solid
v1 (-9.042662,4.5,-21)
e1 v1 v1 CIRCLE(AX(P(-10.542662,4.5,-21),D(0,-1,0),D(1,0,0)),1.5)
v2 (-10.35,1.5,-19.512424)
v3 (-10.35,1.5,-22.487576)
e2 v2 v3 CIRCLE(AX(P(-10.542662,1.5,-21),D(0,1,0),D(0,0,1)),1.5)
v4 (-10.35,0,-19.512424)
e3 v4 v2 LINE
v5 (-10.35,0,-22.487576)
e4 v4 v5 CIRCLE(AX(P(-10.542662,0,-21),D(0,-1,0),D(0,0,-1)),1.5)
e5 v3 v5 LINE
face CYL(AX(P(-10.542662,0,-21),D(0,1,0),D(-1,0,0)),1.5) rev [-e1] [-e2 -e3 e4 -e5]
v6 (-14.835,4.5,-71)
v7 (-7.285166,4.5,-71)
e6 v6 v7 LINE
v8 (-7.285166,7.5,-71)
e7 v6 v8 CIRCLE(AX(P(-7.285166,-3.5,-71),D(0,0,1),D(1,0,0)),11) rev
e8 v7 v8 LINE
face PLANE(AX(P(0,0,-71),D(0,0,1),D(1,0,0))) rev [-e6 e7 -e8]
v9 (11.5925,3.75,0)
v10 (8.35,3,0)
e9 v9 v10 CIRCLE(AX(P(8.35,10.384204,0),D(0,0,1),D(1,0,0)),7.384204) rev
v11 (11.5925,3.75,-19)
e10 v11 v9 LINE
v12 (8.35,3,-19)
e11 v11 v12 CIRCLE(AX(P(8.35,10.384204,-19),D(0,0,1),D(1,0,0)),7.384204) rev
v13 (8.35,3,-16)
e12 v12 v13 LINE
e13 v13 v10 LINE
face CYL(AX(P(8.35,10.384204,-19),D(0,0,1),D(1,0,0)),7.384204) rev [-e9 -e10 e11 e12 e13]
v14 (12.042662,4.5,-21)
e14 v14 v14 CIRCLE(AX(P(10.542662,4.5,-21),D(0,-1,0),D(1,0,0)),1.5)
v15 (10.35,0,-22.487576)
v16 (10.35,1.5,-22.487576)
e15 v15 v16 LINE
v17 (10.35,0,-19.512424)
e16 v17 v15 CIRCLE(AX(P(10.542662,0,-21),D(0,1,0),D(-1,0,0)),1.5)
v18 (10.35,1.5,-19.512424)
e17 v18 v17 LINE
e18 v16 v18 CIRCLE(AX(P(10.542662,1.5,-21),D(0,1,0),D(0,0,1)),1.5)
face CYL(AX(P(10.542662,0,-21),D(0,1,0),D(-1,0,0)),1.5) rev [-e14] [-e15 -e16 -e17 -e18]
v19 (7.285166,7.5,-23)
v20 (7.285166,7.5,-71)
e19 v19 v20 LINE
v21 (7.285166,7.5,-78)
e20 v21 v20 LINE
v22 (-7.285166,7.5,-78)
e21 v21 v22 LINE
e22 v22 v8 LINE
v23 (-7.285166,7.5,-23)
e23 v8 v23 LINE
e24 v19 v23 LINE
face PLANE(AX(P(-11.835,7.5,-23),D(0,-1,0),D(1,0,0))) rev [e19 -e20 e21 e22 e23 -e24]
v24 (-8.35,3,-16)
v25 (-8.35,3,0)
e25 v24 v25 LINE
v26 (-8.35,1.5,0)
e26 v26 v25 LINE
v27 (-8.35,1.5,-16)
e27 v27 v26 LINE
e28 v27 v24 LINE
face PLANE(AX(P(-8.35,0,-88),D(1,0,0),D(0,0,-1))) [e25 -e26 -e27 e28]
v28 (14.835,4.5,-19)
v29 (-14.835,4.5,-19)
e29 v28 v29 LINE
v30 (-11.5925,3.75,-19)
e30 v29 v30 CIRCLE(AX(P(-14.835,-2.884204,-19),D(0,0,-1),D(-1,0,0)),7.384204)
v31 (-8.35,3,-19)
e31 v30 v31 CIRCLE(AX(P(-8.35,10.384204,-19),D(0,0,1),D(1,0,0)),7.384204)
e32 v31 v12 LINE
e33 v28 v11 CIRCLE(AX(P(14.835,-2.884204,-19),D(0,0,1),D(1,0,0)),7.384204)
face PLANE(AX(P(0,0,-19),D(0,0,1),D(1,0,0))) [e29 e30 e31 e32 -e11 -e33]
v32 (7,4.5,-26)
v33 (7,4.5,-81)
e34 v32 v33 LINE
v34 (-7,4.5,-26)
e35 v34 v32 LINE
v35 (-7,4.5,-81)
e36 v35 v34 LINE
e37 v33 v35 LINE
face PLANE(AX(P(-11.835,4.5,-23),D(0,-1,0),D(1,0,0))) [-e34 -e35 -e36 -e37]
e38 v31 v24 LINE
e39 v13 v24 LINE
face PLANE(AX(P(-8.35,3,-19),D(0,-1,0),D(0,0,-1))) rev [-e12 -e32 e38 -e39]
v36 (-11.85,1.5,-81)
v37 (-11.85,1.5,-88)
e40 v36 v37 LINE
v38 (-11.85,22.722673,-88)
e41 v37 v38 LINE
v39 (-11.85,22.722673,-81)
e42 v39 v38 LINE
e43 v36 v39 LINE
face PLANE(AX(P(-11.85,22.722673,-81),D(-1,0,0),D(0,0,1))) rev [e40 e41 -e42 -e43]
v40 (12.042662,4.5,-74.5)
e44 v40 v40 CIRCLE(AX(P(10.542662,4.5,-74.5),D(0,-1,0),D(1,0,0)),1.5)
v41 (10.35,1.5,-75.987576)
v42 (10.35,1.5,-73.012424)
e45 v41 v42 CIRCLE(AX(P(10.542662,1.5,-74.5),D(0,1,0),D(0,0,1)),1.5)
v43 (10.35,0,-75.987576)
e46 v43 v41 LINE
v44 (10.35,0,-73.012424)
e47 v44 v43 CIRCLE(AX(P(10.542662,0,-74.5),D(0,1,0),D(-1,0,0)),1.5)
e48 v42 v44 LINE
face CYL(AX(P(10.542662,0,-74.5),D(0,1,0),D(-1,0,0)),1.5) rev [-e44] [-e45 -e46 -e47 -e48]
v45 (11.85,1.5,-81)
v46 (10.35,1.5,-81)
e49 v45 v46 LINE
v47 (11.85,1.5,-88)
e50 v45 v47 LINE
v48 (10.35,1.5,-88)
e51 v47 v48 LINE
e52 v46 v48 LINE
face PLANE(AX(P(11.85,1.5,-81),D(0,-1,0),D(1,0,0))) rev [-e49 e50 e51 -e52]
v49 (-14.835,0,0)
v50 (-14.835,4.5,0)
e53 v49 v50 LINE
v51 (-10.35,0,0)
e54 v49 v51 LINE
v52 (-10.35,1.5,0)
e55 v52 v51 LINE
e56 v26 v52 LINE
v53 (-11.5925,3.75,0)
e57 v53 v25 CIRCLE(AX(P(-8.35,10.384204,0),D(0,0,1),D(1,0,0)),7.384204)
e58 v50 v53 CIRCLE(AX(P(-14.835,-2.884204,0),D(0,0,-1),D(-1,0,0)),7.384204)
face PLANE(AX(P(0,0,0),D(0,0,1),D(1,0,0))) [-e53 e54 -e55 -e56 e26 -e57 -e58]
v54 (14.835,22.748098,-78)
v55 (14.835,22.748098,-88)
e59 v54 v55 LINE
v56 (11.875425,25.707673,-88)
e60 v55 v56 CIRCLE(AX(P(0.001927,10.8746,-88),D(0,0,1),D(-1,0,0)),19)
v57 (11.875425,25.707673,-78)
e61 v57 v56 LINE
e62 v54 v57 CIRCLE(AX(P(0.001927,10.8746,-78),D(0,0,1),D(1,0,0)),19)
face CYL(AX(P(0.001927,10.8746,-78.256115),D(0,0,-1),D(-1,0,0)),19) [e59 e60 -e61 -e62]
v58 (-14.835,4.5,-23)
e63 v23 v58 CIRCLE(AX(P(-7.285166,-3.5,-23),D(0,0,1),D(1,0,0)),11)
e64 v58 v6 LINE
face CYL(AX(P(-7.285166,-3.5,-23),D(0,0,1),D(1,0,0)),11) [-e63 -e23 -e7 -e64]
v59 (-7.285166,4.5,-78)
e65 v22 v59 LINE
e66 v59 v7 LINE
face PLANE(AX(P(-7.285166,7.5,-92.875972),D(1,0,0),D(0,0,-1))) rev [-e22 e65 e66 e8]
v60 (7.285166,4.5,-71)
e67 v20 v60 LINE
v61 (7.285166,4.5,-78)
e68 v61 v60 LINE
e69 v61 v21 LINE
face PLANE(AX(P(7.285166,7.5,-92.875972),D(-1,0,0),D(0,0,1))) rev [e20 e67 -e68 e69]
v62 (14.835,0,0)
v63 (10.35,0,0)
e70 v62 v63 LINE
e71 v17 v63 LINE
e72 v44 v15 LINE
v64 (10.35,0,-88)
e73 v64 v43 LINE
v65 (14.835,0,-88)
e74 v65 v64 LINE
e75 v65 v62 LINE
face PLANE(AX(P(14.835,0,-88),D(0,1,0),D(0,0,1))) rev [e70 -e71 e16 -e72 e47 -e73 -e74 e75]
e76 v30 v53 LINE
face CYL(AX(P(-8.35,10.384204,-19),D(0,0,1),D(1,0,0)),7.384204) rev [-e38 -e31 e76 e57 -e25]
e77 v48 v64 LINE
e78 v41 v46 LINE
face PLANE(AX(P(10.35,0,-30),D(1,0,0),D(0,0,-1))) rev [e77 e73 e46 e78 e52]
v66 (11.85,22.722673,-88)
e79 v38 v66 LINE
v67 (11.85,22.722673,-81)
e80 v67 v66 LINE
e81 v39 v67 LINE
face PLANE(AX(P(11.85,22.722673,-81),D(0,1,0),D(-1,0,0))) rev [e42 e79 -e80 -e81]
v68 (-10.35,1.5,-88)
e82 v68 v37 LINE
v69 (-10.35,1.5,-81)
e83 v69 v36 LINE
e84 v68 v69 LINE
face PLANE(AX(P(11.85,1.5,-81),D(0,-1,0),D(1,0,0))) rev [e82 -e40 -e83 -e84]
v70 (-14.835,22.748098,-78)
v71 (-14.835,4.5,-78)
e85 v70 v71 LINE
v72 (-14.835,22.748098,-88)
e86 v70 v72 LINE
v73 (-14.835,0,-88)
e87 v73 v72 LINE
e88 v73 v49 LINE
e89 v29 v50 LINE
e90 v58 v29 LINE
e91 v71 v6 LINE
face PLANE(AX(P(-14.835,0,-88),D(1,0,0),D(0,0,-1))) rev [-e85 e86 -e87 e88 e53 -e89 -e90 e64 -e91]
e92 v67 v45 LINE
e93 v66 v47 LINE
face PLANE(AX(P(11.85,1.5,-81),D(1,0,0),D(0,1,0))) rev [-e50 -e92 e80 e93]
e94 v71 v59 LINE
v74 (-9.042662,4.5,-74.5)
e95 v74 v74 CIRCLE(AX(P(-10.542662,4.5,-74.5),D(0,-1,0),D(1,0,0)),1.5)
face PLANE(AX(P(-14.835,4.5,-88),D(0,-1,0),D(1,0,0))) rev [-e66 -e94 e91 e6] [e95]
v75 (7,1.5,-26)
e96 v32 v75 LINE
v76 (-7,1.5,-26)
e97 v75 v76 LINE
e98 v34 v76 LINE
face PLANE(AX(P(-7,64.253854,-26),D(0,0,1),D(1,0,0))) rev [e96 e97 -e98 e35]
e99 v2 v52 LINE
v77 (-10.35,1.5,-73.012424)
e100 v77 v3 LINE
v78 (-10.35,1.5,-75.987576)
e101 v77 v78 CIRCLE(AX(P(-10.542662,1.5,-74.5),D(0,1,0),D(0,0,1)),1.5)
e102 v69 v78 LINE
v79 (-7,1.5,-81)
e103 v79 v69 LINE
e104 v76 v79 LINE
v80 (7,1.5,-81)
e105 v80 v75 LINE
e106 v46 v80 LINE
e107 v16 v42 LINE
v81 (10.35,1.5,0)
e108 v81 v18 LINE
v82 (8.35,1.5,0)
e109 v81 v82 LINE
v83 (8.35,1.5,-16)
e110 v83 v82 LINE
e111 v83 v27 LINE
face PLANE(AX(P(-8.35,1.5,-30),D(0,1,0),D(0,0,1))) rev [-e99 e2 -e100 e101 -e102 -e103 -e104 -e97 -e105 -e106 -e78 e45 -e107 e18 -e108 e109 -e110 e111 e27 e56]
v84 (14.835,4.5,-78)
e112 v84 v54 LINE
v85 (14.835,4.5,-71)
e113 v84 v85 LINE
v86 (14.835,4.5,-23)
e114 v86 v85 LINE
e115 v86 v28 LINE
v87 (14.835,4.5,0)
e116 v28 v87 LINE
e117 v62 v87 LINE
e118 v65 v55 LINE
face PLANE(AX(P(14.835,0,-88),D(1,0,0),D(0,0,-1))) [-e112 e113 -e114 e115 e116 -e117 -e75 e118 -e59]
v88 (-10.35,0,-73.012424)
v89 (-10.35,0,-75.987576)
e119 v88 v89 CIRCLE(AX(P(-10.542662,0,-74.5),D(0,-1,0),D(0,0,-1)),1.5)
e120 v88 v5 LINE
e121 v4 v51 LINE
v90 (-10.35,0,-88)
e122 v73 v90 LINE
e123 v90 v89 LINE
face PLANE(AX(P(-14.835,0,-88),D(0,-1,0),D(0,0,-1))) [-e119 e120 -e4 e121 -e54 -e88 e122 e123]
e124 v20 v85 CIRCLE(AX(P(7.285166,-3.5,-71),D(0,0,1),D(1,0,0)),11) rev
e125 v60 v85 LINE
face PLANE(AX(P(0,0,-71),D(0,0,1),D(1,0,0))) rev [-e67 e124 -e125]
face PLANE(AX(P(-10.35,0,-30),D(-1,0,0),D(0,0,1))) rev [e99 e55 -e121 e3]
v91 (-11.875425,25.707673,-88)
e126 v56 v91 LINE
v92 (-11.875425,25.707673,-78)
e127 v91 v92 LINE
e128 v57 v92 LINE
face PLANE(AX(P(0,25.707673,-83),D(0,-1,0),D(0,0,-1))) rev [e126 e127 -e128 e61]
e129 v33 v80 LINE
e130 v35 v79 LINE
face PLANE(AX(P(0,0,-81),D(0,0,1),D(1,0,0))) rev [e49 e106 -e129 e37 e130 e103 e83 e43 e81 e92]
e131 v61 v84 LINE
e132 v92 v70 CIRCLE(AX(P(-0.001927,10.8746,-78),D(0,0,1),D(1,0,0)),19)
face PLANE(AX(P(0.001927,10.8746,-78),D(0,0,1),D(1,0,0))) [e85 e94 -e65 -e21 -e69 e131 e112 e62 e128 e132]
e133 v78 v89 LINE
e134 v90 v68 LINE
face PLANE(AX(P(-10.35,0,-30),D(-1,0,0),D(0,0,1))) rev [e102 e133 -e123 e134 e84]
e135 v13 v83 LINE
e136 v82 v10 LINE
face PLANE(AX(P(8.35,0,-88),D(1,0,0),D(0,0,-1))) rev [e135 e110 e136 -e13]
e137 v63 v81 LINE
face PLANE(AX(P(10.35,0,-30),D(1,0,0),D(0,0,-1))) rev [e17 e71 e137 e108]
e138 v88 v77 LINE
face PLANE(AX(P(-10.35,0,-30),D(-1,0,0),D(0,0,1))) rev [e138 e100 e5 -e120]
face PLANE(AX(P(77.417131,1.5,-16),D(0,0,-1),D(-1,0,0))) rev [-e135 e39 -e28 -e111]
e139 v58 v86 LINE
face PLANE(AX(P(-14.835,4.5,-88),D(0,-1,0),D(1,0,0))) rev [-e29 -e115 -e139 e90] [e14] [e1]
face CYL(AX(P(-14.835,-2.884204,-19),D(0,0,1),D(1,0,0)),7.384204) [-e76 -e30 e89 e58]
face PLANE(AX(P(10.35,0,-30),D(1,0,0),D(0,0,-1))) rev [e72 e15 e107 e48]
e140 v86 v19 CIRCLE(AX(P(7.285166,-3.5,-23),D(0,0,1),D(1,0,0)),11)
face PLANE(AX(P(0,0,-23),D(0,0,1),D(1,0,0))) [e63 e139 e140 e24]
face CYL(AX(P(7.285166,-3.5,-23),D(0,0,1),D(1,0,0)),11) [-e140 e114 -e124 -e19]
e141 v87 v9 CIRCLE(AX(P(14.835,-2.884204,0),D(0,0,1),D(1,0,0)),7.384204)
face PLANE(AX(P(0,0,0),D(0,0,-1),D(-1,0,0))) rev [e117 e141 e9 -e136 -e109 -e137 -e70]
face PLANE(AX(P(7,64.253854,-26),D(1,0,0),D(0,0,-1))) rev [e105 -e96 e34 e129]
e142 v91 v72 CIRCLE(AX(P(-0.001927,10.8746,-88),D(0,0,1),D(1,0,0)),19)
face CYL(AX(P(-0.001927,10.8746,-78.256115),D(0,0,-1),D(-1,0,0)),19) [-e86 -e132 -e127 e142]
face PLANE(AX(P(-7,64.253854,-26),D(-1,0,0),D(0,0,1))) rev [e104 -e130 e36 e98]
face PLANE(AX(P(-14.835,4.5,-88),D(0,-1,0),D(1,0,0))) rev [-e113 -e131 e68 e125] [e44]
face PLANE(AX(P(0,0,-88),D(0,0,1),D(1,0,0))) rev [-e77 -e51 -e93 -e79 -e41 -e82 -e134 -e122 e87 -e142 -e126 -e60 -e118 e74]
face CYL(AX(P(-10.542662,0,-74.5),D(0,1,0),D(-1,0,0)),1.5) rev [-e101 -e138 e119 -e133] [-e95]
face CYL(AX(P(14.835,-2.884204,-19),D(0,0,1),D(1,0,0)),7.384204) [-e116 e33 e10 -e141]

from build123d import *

# Parameters (mm, degrees)
SKETCH1_W               = 6.485
SKETCH1_H               = 4.5
BOSS_EXTRUDE1_DEPTH     = 88
BOSS_EXTRUDE1_2_DEPTH   = 88
SKETCH3_W               = 2
SKETCH3_H               = 1.5
CUT_EXTRUDE2_DEPTH      = 30
SKETCH4_W               = 2
SKETCH4_H               = 4.5
CUT_EXTRUDE3_DEPTH      = 65
BOSS_EXTRUDE2_REACH     = 93.644
SKETCH6_W               = 67
SKETCH6_H               = 3
BOSS_EXTRUDE3_DEPTH     = 5
CUT_EXTRUDE4_DEPTH      = 5
BOSS_EXTRUDE4_DEPTH     = 5
BOSS_EXTRUDE5_START     = 7
BOSS_EXTRUDE5_DEPTH     = 48
BOSS_EXTRUDE6_DEPTH     = 48
FILLET1_R               = 11
SKETCH18_W              = 14.57033113
SKETCH18_H              = 3
BOSS_EXTRUDE7_DEPTH     = 7
SKETCH15_W              = 23.7
SKETCH15_H              = 21.22267295
CUT_EXTRUDE6_DEPTH      = 7
SKETCH16_W              = 16.7
SKETCH16_H              = 1.5
CUT_EXTRUDE7_DEPTH      = 19
CUT_EXTRUDE5_DEPTH      = 92.727000479
CUT_EXTRUDE5_DEPTH_BACK = 92.727000479
SKETCH13_R              = 1.5
SKETCH17_W              = 14
SKETCH17_H              = 55
CUT_EXTRUDE8_DEPTH      = 3


with BuildPart() as part:
    # Sketch1 → Boss-Extrude1 (new body)
    with BuildSketch(Plane.XY):
        with Locations((-11.5925, 2.25)):
            Rectangle(SKETCH1_W, SKETCH1_H)
    extrude(amount=-BOSS_EXTRUDE1_DEPTH)


with BuildPart() as body_2:
    # Sketch1 → Boss-Extrude1 2 (new body)
    with BuildSketch(Plane.XY):
        with Locations((11.5925, 2.25)):
            Rectangle(SKETCH1_W, SKETCH1_H)
    extrude(amount=-BOSS_EXTRUDE1_2_DEPTH)


with BuildPart() as cut_extrude2_tool:
    # Sketch3 → Cut-Extrude2 (new body)
    with BuildSketch(Plane.XY):
        with Locations((-9.35, 0.75)):
            Rectangle(SKETCH3_W, SKETCH3_H)
        with Locations((9.35, 0.75)):
            Rectangle(SKETCH3_W, SKETCH3_H)
    extrude(amount=-CUT_EXTRUDE2_DEPTH)


with BuildPart() as part_1:
    add(part.part)

    # Cut-Extrude2: cut by cut_extrude2_tool
    add(cut_extrude2_tool.part, mode=Mode.SUBTRACT)


with BuildPart() as body_2_1:
    add(body_2.part)

    # Cut-Extrude2: cut by cut_extrude2_tool
    add(cut_extrude2_tool.part, mode=Mode.SUBTRACT)


with BuildPart() as cut_extrude3_tool:
    # Sketch4 → Cut-Extrude3 (new body)
    with BuildSketch(Plane(origin=(0, 0, -88), x_dir=(-1, 0, 0), z_dir=(0, 0, -1))):
        with Locations((9.35, 2.25)):
            Rectangle(SKETCH4_W, SKETCH4_H)
        with Locations((-9.35, 2.25)):
            Rectangle(SKETCH4_W, SKETCH4_H)
    extrude(amount=-CUT_EXTRUDE3_DEPTH)


with BuildPart() as part_2:
    add(part_1.part)

    # Cut-Extrude3: cut by cut_extrude3_tool
    add(cut_extrude3_tool.part, mode=Mode.SUBTRACT)


with BuildPart() as body_2_2:
    add(body_2_1.part)

    # Cut-Extrude3: cut by cut_extrude3_tool
    add(cut_extrude3_tool.part, mode=Mode.SUBTRACT)

    # Boss-Extrude2: up to this face of the body (flat: up to its plane)
    boss_extrude2_end = Plane(body_2_2.part.faces().sort_by_distance((10.35, 2.091743119, -50.857798165))[0])
    # Sketch6 → Boss-Extrude2 (add, up to the picked face)
    with BuildSketch(Plane(origin=(-10.35, 0, 0), x_dir=(0, 0, -1), z_dir=(1, 0, 0)), mode=Mode.PRIVATE) as boss_extrude2_sk1:
        with Locations((49.5, 3)):
            Rectangle(SKETCH6_W, SKETCH6_H)
    boss_extrude2_tool1 = split(extrude(boss_extrude2_sk1.sketch, amount=BOSS_EXTRUDE2_REACH, mode=Mode.PRIVATE), bisect_by=boss_extrude2_end, keep=Keep.BOTH, mode=Mode.PRIVATE)

    add(part_2.part)  # Boss-Extrude2 merges part
    add(boss_extrude2_tool1.solids().sort_by(Axis((-10.35, 3, -49.5), (1, 0, 0)))[0])

    # Sketch8 → Boss-Extrude3 (add)
    with BuildSketch(Plane(origin=(0, 0, -88), x_dir=(-1, 0, 0), z_dir=(0, 0, -1))):
        Polygon((-14.835, 25.70767295), (-14.835, 4.5), (-10.35, 4.5), (-10.35, 21.22267295), (10.35, 21.22267295), (10.35, 4.5), (14.835, 4.5), (14.835, 25.70767295), align=None)
    extrude(amount=-BOSS_EXTRUDE3_DEPTH)

    # Sketch9 → Cut-Extrude4 (cut)
    with BuildSketch(Plane(origin=(0, 0, -88), x_dir=(-1, 0, 0), z_dir=(0, 0, -1))):
        with BuildLine():
            Line((-15.009070225, 25.881743175), (-15.009070225, 22.527310239))
            ThreePointArc((-15.009070225, 22.527310239), (-13.436955933, 24.309628883), (-11.654637289, 25.881743175))
            Line((-11.654637289, 25.881743175), (-15.009070225, 25.881743175))
        make_face()
        with BuildLine():
            Line((15.009070225, 25.881743175), (15.009070225, 22.527310239))
            ThreePointArc((15.009070225, 22.527310239), (13.436955933, 24.309628883), (11.654637289, 25.881743175))
            Line((11.654637289, 25.881743175), (15.009070225, 25.881743175))
        make_face()
    extrude(amount=-CUT_EXTRUDE4_DEPTH, mode=Mode.SUBTRACT)

    # Sketch11 → Boss-Extrude4 (add)
    with BuildSketch(Plane.XY.offset(-83)):
        with BuildLine():
            Line((14.835, 4.5), (14.835, 22.748097759))
            ThreePointArc((14.835, 22.748097759), (13.436955933, 24.309628883), (11.875424809, 25.70767295))
            Line((11.875424809, 25.70767295), (-11.875424809, 25.70767295))
            ThreePointArc((-11.875424809, 25.70767295), (-13.436955933, 24.309628883), (-14.835, 22.748097759))
            Line((-14.835, 22.748097759), (-14.835, 4.5))
            Line((-14.835, 4.5), (14.835, 4.5))
        make_face()
    extrude(amount=BOSS_EXTRUDE4_DEPTH)

    # Sketch12 → Boss-Extrude5 (add)
    with BuildSketch(Plane.XY.offset(-78).offset(BOSS_EXTRUDE5_START)):
        Polygon((-14.835, 4.5), (-11.835, 7.5), (11.835, 7.5), (14.835, 4.5), align=None)
    extrude(amount=BOSS_EXTRUDE5_DEPTH)

    # Sketch14 → Boss-Extrude6 (add)
    with BuildSketch(Plane.XY.offset(-23)):
        Polygon((-11.835, 7.5), (-14.835, 4.5), (-10.835, 4.5), (-10.835, 7.5), align=None)
        Polygon((11.835, 7.5), (14.835, 4.5), (10.835, 4.5), (10.835, 7.5), align=None)
    extrude(amount=-BOSS_EXTRUDE6_DEPTH)

    # Fillet1
    # the kernel refuses this fillet: 11 mm, written as the material it takes off along each edge
    with BuildSketch(Plane(origin=(11.835, 7.5, -82.374586088), x_dir=(-1, 0, 0), z_dir=(0, 0, 1))) as fillet1_piece_1_section:
        with BuildLine():
            CenterArc((4.549834435, 11), FILLET1_R, 226.658241773, 43.341758227)
            Line((-3, 3), (0, 0))
            Line((0, 0), (4.549834435, 0))
        make_face()
    fillet1_piece_1 = extrude(amount=70.749172176, mode=Mode.PRIVATE)
    fillet1_piece_1 = split(fillet1_piece_1, bisect_by=Plane(origin=(11.355308805, 6.742969198, -78), z_dir=(0, 0, 1)), keep=Keep.TOP, mode=Mode.PRIVATE)
    add(fillet1_piece_1, mode=Mode.SUBTRACT)
    with BuildSketch(Plane(origin=(-11.835, 7.5, -82.374586088), x_dir=(1, 0, 0), z_dir=(0, 0, 1))) as fillet1_piece_2_section:
        with BuildLine():
            CenterArc((4.549834435, -11), FILLET1_R, 90, 43.341758227)
            Line((-3, -3), (0, 0))
            Line((0, 0), (4.549834435, 0))
        make_face()
    fillet1_piece_2 = extrude(amount=70.749172176, mode=Mode.PRIVATE)
    fillet1_piece_2 = split(fillet1_piece_2, bisect_by=Plane(origin=(-11.355308805, 6.742969198, -78), z_dir=(0, 0, 1)), keep=Keep.TOP, mode=Mode.PRIVATE)
    add(fillet1_piece_2, mode=Mode.SUBTRACT)

    # Sketch18 → Boss-Extrude7 (add)
    with BuildSketch(Plane(origin=(0, 0, -71), x_dir=(-1, 0, 0), z_dir=(0, 0, -1))):
        with Locations((0, 6)):
            Rectangle(SKETCH18_W, SKETCH18_H)
    extrude(amount=BOSS_EXTRUDE7_DEPTH)

    # Sketch15 → Cut-Extrude6 (cut)
    with BuildSketch(Plane(origin=(0, 0, -88), x_dir=(-1, 0, 0), z_dir=(0, 0, -1))):
        with Locations((0, 12.111336475)):
            Rectangle(SKETCH15_W, SKETCH15_H)
    extrude(amount=-CUT_EXTRUDE6_DEPTH, mode=Mode.SUBTRACT)

    # Sketch16 → Cut-Extrude7 (cut)
    with BuildSketch(Plane.XY):
        with BuildLine():
            ThreePointArc((11.5925, 3.75), (10.014054255, 3.189942939), (8.35, 3))
            Line((8.35, 3), (8.35, 4.5))
            Line((8.35, 4.5), (14.835, 4.5))
            ThreePointArc((14.835, 4.5), (13.170945745, 4.310057061), (11.5925, 3.75))
        make_face()
        with BuildLine():
            ThreePointArc((-11.5925, 3.75), (-10.014054255, 3.189942939), (-8.35, 3))
            Line((-8.35, 3), (-8.35, 4.5))
            Line((-8.35, 4.5), (-14.835, 4.5))
            ThreePointArc((-14.835, 4.5), (-13.170945745, 4.310057061), (-11.5925, 3.75))
        make_face()
        with Locations((0, 3.75)):
            Rectangle(SKETCH16_W, SKETCH16_H)
    extrude(amount=-CUT_EXTRUDE7_DEPTH, mode=Mode.SUBTRACT)

    # Sketch13 → Cut-Extrude5 (cut, two sides: drawn at the far end of the back side and taken through both)
    with BuildSketch(Plane(origin=(0, 4.5, 0), x_dir=(1, 0, 0), z_dir=(0, 1, 0)).offset(-CUT_EXTRUDE5_DEPTH_BACK)):
        with Locations(Location((10.542662348, 74.5, 0), (0, 0, 97.379545614))):
            Circle(SKETCH13_R)
        with Locations(Location((-10.542662348, 74.5, 0), (0, 0, 277.379545614))):
            Circle(SKETCH13_R)
        with Locations(Location((10.542662348, 21, 0), (0, 0, 97.379545614))):
            Circle(SKETCH13_R)
        with Locations(Location((-10.542662348, 21, 0), (0, 0, 277.379545614))):
            Circle(SKETCH13_R)
    extrude(amount=CUT_EXTRUDE5_DEPTH + CUT_EXTRUDE5_DEPTH_BACK, mode=Mode.SUBTRACT)

    # Sketch17 → Cut-Extrude8 (cut)
    with BuildSketch(Plane(origin=(0, 1.5, 0), x_dir=(-1, 0, 0), z_dir=(0, -1, 0))):
        with Locations((0, 53.5)):
            Rectangle(SKETCH17_W, SKETCH17_H)
    extrude(amount=-CUT_EXTRUDE8_DEPTH, mode=Mode.SUBTRACT)


solid = body_2_2.part
